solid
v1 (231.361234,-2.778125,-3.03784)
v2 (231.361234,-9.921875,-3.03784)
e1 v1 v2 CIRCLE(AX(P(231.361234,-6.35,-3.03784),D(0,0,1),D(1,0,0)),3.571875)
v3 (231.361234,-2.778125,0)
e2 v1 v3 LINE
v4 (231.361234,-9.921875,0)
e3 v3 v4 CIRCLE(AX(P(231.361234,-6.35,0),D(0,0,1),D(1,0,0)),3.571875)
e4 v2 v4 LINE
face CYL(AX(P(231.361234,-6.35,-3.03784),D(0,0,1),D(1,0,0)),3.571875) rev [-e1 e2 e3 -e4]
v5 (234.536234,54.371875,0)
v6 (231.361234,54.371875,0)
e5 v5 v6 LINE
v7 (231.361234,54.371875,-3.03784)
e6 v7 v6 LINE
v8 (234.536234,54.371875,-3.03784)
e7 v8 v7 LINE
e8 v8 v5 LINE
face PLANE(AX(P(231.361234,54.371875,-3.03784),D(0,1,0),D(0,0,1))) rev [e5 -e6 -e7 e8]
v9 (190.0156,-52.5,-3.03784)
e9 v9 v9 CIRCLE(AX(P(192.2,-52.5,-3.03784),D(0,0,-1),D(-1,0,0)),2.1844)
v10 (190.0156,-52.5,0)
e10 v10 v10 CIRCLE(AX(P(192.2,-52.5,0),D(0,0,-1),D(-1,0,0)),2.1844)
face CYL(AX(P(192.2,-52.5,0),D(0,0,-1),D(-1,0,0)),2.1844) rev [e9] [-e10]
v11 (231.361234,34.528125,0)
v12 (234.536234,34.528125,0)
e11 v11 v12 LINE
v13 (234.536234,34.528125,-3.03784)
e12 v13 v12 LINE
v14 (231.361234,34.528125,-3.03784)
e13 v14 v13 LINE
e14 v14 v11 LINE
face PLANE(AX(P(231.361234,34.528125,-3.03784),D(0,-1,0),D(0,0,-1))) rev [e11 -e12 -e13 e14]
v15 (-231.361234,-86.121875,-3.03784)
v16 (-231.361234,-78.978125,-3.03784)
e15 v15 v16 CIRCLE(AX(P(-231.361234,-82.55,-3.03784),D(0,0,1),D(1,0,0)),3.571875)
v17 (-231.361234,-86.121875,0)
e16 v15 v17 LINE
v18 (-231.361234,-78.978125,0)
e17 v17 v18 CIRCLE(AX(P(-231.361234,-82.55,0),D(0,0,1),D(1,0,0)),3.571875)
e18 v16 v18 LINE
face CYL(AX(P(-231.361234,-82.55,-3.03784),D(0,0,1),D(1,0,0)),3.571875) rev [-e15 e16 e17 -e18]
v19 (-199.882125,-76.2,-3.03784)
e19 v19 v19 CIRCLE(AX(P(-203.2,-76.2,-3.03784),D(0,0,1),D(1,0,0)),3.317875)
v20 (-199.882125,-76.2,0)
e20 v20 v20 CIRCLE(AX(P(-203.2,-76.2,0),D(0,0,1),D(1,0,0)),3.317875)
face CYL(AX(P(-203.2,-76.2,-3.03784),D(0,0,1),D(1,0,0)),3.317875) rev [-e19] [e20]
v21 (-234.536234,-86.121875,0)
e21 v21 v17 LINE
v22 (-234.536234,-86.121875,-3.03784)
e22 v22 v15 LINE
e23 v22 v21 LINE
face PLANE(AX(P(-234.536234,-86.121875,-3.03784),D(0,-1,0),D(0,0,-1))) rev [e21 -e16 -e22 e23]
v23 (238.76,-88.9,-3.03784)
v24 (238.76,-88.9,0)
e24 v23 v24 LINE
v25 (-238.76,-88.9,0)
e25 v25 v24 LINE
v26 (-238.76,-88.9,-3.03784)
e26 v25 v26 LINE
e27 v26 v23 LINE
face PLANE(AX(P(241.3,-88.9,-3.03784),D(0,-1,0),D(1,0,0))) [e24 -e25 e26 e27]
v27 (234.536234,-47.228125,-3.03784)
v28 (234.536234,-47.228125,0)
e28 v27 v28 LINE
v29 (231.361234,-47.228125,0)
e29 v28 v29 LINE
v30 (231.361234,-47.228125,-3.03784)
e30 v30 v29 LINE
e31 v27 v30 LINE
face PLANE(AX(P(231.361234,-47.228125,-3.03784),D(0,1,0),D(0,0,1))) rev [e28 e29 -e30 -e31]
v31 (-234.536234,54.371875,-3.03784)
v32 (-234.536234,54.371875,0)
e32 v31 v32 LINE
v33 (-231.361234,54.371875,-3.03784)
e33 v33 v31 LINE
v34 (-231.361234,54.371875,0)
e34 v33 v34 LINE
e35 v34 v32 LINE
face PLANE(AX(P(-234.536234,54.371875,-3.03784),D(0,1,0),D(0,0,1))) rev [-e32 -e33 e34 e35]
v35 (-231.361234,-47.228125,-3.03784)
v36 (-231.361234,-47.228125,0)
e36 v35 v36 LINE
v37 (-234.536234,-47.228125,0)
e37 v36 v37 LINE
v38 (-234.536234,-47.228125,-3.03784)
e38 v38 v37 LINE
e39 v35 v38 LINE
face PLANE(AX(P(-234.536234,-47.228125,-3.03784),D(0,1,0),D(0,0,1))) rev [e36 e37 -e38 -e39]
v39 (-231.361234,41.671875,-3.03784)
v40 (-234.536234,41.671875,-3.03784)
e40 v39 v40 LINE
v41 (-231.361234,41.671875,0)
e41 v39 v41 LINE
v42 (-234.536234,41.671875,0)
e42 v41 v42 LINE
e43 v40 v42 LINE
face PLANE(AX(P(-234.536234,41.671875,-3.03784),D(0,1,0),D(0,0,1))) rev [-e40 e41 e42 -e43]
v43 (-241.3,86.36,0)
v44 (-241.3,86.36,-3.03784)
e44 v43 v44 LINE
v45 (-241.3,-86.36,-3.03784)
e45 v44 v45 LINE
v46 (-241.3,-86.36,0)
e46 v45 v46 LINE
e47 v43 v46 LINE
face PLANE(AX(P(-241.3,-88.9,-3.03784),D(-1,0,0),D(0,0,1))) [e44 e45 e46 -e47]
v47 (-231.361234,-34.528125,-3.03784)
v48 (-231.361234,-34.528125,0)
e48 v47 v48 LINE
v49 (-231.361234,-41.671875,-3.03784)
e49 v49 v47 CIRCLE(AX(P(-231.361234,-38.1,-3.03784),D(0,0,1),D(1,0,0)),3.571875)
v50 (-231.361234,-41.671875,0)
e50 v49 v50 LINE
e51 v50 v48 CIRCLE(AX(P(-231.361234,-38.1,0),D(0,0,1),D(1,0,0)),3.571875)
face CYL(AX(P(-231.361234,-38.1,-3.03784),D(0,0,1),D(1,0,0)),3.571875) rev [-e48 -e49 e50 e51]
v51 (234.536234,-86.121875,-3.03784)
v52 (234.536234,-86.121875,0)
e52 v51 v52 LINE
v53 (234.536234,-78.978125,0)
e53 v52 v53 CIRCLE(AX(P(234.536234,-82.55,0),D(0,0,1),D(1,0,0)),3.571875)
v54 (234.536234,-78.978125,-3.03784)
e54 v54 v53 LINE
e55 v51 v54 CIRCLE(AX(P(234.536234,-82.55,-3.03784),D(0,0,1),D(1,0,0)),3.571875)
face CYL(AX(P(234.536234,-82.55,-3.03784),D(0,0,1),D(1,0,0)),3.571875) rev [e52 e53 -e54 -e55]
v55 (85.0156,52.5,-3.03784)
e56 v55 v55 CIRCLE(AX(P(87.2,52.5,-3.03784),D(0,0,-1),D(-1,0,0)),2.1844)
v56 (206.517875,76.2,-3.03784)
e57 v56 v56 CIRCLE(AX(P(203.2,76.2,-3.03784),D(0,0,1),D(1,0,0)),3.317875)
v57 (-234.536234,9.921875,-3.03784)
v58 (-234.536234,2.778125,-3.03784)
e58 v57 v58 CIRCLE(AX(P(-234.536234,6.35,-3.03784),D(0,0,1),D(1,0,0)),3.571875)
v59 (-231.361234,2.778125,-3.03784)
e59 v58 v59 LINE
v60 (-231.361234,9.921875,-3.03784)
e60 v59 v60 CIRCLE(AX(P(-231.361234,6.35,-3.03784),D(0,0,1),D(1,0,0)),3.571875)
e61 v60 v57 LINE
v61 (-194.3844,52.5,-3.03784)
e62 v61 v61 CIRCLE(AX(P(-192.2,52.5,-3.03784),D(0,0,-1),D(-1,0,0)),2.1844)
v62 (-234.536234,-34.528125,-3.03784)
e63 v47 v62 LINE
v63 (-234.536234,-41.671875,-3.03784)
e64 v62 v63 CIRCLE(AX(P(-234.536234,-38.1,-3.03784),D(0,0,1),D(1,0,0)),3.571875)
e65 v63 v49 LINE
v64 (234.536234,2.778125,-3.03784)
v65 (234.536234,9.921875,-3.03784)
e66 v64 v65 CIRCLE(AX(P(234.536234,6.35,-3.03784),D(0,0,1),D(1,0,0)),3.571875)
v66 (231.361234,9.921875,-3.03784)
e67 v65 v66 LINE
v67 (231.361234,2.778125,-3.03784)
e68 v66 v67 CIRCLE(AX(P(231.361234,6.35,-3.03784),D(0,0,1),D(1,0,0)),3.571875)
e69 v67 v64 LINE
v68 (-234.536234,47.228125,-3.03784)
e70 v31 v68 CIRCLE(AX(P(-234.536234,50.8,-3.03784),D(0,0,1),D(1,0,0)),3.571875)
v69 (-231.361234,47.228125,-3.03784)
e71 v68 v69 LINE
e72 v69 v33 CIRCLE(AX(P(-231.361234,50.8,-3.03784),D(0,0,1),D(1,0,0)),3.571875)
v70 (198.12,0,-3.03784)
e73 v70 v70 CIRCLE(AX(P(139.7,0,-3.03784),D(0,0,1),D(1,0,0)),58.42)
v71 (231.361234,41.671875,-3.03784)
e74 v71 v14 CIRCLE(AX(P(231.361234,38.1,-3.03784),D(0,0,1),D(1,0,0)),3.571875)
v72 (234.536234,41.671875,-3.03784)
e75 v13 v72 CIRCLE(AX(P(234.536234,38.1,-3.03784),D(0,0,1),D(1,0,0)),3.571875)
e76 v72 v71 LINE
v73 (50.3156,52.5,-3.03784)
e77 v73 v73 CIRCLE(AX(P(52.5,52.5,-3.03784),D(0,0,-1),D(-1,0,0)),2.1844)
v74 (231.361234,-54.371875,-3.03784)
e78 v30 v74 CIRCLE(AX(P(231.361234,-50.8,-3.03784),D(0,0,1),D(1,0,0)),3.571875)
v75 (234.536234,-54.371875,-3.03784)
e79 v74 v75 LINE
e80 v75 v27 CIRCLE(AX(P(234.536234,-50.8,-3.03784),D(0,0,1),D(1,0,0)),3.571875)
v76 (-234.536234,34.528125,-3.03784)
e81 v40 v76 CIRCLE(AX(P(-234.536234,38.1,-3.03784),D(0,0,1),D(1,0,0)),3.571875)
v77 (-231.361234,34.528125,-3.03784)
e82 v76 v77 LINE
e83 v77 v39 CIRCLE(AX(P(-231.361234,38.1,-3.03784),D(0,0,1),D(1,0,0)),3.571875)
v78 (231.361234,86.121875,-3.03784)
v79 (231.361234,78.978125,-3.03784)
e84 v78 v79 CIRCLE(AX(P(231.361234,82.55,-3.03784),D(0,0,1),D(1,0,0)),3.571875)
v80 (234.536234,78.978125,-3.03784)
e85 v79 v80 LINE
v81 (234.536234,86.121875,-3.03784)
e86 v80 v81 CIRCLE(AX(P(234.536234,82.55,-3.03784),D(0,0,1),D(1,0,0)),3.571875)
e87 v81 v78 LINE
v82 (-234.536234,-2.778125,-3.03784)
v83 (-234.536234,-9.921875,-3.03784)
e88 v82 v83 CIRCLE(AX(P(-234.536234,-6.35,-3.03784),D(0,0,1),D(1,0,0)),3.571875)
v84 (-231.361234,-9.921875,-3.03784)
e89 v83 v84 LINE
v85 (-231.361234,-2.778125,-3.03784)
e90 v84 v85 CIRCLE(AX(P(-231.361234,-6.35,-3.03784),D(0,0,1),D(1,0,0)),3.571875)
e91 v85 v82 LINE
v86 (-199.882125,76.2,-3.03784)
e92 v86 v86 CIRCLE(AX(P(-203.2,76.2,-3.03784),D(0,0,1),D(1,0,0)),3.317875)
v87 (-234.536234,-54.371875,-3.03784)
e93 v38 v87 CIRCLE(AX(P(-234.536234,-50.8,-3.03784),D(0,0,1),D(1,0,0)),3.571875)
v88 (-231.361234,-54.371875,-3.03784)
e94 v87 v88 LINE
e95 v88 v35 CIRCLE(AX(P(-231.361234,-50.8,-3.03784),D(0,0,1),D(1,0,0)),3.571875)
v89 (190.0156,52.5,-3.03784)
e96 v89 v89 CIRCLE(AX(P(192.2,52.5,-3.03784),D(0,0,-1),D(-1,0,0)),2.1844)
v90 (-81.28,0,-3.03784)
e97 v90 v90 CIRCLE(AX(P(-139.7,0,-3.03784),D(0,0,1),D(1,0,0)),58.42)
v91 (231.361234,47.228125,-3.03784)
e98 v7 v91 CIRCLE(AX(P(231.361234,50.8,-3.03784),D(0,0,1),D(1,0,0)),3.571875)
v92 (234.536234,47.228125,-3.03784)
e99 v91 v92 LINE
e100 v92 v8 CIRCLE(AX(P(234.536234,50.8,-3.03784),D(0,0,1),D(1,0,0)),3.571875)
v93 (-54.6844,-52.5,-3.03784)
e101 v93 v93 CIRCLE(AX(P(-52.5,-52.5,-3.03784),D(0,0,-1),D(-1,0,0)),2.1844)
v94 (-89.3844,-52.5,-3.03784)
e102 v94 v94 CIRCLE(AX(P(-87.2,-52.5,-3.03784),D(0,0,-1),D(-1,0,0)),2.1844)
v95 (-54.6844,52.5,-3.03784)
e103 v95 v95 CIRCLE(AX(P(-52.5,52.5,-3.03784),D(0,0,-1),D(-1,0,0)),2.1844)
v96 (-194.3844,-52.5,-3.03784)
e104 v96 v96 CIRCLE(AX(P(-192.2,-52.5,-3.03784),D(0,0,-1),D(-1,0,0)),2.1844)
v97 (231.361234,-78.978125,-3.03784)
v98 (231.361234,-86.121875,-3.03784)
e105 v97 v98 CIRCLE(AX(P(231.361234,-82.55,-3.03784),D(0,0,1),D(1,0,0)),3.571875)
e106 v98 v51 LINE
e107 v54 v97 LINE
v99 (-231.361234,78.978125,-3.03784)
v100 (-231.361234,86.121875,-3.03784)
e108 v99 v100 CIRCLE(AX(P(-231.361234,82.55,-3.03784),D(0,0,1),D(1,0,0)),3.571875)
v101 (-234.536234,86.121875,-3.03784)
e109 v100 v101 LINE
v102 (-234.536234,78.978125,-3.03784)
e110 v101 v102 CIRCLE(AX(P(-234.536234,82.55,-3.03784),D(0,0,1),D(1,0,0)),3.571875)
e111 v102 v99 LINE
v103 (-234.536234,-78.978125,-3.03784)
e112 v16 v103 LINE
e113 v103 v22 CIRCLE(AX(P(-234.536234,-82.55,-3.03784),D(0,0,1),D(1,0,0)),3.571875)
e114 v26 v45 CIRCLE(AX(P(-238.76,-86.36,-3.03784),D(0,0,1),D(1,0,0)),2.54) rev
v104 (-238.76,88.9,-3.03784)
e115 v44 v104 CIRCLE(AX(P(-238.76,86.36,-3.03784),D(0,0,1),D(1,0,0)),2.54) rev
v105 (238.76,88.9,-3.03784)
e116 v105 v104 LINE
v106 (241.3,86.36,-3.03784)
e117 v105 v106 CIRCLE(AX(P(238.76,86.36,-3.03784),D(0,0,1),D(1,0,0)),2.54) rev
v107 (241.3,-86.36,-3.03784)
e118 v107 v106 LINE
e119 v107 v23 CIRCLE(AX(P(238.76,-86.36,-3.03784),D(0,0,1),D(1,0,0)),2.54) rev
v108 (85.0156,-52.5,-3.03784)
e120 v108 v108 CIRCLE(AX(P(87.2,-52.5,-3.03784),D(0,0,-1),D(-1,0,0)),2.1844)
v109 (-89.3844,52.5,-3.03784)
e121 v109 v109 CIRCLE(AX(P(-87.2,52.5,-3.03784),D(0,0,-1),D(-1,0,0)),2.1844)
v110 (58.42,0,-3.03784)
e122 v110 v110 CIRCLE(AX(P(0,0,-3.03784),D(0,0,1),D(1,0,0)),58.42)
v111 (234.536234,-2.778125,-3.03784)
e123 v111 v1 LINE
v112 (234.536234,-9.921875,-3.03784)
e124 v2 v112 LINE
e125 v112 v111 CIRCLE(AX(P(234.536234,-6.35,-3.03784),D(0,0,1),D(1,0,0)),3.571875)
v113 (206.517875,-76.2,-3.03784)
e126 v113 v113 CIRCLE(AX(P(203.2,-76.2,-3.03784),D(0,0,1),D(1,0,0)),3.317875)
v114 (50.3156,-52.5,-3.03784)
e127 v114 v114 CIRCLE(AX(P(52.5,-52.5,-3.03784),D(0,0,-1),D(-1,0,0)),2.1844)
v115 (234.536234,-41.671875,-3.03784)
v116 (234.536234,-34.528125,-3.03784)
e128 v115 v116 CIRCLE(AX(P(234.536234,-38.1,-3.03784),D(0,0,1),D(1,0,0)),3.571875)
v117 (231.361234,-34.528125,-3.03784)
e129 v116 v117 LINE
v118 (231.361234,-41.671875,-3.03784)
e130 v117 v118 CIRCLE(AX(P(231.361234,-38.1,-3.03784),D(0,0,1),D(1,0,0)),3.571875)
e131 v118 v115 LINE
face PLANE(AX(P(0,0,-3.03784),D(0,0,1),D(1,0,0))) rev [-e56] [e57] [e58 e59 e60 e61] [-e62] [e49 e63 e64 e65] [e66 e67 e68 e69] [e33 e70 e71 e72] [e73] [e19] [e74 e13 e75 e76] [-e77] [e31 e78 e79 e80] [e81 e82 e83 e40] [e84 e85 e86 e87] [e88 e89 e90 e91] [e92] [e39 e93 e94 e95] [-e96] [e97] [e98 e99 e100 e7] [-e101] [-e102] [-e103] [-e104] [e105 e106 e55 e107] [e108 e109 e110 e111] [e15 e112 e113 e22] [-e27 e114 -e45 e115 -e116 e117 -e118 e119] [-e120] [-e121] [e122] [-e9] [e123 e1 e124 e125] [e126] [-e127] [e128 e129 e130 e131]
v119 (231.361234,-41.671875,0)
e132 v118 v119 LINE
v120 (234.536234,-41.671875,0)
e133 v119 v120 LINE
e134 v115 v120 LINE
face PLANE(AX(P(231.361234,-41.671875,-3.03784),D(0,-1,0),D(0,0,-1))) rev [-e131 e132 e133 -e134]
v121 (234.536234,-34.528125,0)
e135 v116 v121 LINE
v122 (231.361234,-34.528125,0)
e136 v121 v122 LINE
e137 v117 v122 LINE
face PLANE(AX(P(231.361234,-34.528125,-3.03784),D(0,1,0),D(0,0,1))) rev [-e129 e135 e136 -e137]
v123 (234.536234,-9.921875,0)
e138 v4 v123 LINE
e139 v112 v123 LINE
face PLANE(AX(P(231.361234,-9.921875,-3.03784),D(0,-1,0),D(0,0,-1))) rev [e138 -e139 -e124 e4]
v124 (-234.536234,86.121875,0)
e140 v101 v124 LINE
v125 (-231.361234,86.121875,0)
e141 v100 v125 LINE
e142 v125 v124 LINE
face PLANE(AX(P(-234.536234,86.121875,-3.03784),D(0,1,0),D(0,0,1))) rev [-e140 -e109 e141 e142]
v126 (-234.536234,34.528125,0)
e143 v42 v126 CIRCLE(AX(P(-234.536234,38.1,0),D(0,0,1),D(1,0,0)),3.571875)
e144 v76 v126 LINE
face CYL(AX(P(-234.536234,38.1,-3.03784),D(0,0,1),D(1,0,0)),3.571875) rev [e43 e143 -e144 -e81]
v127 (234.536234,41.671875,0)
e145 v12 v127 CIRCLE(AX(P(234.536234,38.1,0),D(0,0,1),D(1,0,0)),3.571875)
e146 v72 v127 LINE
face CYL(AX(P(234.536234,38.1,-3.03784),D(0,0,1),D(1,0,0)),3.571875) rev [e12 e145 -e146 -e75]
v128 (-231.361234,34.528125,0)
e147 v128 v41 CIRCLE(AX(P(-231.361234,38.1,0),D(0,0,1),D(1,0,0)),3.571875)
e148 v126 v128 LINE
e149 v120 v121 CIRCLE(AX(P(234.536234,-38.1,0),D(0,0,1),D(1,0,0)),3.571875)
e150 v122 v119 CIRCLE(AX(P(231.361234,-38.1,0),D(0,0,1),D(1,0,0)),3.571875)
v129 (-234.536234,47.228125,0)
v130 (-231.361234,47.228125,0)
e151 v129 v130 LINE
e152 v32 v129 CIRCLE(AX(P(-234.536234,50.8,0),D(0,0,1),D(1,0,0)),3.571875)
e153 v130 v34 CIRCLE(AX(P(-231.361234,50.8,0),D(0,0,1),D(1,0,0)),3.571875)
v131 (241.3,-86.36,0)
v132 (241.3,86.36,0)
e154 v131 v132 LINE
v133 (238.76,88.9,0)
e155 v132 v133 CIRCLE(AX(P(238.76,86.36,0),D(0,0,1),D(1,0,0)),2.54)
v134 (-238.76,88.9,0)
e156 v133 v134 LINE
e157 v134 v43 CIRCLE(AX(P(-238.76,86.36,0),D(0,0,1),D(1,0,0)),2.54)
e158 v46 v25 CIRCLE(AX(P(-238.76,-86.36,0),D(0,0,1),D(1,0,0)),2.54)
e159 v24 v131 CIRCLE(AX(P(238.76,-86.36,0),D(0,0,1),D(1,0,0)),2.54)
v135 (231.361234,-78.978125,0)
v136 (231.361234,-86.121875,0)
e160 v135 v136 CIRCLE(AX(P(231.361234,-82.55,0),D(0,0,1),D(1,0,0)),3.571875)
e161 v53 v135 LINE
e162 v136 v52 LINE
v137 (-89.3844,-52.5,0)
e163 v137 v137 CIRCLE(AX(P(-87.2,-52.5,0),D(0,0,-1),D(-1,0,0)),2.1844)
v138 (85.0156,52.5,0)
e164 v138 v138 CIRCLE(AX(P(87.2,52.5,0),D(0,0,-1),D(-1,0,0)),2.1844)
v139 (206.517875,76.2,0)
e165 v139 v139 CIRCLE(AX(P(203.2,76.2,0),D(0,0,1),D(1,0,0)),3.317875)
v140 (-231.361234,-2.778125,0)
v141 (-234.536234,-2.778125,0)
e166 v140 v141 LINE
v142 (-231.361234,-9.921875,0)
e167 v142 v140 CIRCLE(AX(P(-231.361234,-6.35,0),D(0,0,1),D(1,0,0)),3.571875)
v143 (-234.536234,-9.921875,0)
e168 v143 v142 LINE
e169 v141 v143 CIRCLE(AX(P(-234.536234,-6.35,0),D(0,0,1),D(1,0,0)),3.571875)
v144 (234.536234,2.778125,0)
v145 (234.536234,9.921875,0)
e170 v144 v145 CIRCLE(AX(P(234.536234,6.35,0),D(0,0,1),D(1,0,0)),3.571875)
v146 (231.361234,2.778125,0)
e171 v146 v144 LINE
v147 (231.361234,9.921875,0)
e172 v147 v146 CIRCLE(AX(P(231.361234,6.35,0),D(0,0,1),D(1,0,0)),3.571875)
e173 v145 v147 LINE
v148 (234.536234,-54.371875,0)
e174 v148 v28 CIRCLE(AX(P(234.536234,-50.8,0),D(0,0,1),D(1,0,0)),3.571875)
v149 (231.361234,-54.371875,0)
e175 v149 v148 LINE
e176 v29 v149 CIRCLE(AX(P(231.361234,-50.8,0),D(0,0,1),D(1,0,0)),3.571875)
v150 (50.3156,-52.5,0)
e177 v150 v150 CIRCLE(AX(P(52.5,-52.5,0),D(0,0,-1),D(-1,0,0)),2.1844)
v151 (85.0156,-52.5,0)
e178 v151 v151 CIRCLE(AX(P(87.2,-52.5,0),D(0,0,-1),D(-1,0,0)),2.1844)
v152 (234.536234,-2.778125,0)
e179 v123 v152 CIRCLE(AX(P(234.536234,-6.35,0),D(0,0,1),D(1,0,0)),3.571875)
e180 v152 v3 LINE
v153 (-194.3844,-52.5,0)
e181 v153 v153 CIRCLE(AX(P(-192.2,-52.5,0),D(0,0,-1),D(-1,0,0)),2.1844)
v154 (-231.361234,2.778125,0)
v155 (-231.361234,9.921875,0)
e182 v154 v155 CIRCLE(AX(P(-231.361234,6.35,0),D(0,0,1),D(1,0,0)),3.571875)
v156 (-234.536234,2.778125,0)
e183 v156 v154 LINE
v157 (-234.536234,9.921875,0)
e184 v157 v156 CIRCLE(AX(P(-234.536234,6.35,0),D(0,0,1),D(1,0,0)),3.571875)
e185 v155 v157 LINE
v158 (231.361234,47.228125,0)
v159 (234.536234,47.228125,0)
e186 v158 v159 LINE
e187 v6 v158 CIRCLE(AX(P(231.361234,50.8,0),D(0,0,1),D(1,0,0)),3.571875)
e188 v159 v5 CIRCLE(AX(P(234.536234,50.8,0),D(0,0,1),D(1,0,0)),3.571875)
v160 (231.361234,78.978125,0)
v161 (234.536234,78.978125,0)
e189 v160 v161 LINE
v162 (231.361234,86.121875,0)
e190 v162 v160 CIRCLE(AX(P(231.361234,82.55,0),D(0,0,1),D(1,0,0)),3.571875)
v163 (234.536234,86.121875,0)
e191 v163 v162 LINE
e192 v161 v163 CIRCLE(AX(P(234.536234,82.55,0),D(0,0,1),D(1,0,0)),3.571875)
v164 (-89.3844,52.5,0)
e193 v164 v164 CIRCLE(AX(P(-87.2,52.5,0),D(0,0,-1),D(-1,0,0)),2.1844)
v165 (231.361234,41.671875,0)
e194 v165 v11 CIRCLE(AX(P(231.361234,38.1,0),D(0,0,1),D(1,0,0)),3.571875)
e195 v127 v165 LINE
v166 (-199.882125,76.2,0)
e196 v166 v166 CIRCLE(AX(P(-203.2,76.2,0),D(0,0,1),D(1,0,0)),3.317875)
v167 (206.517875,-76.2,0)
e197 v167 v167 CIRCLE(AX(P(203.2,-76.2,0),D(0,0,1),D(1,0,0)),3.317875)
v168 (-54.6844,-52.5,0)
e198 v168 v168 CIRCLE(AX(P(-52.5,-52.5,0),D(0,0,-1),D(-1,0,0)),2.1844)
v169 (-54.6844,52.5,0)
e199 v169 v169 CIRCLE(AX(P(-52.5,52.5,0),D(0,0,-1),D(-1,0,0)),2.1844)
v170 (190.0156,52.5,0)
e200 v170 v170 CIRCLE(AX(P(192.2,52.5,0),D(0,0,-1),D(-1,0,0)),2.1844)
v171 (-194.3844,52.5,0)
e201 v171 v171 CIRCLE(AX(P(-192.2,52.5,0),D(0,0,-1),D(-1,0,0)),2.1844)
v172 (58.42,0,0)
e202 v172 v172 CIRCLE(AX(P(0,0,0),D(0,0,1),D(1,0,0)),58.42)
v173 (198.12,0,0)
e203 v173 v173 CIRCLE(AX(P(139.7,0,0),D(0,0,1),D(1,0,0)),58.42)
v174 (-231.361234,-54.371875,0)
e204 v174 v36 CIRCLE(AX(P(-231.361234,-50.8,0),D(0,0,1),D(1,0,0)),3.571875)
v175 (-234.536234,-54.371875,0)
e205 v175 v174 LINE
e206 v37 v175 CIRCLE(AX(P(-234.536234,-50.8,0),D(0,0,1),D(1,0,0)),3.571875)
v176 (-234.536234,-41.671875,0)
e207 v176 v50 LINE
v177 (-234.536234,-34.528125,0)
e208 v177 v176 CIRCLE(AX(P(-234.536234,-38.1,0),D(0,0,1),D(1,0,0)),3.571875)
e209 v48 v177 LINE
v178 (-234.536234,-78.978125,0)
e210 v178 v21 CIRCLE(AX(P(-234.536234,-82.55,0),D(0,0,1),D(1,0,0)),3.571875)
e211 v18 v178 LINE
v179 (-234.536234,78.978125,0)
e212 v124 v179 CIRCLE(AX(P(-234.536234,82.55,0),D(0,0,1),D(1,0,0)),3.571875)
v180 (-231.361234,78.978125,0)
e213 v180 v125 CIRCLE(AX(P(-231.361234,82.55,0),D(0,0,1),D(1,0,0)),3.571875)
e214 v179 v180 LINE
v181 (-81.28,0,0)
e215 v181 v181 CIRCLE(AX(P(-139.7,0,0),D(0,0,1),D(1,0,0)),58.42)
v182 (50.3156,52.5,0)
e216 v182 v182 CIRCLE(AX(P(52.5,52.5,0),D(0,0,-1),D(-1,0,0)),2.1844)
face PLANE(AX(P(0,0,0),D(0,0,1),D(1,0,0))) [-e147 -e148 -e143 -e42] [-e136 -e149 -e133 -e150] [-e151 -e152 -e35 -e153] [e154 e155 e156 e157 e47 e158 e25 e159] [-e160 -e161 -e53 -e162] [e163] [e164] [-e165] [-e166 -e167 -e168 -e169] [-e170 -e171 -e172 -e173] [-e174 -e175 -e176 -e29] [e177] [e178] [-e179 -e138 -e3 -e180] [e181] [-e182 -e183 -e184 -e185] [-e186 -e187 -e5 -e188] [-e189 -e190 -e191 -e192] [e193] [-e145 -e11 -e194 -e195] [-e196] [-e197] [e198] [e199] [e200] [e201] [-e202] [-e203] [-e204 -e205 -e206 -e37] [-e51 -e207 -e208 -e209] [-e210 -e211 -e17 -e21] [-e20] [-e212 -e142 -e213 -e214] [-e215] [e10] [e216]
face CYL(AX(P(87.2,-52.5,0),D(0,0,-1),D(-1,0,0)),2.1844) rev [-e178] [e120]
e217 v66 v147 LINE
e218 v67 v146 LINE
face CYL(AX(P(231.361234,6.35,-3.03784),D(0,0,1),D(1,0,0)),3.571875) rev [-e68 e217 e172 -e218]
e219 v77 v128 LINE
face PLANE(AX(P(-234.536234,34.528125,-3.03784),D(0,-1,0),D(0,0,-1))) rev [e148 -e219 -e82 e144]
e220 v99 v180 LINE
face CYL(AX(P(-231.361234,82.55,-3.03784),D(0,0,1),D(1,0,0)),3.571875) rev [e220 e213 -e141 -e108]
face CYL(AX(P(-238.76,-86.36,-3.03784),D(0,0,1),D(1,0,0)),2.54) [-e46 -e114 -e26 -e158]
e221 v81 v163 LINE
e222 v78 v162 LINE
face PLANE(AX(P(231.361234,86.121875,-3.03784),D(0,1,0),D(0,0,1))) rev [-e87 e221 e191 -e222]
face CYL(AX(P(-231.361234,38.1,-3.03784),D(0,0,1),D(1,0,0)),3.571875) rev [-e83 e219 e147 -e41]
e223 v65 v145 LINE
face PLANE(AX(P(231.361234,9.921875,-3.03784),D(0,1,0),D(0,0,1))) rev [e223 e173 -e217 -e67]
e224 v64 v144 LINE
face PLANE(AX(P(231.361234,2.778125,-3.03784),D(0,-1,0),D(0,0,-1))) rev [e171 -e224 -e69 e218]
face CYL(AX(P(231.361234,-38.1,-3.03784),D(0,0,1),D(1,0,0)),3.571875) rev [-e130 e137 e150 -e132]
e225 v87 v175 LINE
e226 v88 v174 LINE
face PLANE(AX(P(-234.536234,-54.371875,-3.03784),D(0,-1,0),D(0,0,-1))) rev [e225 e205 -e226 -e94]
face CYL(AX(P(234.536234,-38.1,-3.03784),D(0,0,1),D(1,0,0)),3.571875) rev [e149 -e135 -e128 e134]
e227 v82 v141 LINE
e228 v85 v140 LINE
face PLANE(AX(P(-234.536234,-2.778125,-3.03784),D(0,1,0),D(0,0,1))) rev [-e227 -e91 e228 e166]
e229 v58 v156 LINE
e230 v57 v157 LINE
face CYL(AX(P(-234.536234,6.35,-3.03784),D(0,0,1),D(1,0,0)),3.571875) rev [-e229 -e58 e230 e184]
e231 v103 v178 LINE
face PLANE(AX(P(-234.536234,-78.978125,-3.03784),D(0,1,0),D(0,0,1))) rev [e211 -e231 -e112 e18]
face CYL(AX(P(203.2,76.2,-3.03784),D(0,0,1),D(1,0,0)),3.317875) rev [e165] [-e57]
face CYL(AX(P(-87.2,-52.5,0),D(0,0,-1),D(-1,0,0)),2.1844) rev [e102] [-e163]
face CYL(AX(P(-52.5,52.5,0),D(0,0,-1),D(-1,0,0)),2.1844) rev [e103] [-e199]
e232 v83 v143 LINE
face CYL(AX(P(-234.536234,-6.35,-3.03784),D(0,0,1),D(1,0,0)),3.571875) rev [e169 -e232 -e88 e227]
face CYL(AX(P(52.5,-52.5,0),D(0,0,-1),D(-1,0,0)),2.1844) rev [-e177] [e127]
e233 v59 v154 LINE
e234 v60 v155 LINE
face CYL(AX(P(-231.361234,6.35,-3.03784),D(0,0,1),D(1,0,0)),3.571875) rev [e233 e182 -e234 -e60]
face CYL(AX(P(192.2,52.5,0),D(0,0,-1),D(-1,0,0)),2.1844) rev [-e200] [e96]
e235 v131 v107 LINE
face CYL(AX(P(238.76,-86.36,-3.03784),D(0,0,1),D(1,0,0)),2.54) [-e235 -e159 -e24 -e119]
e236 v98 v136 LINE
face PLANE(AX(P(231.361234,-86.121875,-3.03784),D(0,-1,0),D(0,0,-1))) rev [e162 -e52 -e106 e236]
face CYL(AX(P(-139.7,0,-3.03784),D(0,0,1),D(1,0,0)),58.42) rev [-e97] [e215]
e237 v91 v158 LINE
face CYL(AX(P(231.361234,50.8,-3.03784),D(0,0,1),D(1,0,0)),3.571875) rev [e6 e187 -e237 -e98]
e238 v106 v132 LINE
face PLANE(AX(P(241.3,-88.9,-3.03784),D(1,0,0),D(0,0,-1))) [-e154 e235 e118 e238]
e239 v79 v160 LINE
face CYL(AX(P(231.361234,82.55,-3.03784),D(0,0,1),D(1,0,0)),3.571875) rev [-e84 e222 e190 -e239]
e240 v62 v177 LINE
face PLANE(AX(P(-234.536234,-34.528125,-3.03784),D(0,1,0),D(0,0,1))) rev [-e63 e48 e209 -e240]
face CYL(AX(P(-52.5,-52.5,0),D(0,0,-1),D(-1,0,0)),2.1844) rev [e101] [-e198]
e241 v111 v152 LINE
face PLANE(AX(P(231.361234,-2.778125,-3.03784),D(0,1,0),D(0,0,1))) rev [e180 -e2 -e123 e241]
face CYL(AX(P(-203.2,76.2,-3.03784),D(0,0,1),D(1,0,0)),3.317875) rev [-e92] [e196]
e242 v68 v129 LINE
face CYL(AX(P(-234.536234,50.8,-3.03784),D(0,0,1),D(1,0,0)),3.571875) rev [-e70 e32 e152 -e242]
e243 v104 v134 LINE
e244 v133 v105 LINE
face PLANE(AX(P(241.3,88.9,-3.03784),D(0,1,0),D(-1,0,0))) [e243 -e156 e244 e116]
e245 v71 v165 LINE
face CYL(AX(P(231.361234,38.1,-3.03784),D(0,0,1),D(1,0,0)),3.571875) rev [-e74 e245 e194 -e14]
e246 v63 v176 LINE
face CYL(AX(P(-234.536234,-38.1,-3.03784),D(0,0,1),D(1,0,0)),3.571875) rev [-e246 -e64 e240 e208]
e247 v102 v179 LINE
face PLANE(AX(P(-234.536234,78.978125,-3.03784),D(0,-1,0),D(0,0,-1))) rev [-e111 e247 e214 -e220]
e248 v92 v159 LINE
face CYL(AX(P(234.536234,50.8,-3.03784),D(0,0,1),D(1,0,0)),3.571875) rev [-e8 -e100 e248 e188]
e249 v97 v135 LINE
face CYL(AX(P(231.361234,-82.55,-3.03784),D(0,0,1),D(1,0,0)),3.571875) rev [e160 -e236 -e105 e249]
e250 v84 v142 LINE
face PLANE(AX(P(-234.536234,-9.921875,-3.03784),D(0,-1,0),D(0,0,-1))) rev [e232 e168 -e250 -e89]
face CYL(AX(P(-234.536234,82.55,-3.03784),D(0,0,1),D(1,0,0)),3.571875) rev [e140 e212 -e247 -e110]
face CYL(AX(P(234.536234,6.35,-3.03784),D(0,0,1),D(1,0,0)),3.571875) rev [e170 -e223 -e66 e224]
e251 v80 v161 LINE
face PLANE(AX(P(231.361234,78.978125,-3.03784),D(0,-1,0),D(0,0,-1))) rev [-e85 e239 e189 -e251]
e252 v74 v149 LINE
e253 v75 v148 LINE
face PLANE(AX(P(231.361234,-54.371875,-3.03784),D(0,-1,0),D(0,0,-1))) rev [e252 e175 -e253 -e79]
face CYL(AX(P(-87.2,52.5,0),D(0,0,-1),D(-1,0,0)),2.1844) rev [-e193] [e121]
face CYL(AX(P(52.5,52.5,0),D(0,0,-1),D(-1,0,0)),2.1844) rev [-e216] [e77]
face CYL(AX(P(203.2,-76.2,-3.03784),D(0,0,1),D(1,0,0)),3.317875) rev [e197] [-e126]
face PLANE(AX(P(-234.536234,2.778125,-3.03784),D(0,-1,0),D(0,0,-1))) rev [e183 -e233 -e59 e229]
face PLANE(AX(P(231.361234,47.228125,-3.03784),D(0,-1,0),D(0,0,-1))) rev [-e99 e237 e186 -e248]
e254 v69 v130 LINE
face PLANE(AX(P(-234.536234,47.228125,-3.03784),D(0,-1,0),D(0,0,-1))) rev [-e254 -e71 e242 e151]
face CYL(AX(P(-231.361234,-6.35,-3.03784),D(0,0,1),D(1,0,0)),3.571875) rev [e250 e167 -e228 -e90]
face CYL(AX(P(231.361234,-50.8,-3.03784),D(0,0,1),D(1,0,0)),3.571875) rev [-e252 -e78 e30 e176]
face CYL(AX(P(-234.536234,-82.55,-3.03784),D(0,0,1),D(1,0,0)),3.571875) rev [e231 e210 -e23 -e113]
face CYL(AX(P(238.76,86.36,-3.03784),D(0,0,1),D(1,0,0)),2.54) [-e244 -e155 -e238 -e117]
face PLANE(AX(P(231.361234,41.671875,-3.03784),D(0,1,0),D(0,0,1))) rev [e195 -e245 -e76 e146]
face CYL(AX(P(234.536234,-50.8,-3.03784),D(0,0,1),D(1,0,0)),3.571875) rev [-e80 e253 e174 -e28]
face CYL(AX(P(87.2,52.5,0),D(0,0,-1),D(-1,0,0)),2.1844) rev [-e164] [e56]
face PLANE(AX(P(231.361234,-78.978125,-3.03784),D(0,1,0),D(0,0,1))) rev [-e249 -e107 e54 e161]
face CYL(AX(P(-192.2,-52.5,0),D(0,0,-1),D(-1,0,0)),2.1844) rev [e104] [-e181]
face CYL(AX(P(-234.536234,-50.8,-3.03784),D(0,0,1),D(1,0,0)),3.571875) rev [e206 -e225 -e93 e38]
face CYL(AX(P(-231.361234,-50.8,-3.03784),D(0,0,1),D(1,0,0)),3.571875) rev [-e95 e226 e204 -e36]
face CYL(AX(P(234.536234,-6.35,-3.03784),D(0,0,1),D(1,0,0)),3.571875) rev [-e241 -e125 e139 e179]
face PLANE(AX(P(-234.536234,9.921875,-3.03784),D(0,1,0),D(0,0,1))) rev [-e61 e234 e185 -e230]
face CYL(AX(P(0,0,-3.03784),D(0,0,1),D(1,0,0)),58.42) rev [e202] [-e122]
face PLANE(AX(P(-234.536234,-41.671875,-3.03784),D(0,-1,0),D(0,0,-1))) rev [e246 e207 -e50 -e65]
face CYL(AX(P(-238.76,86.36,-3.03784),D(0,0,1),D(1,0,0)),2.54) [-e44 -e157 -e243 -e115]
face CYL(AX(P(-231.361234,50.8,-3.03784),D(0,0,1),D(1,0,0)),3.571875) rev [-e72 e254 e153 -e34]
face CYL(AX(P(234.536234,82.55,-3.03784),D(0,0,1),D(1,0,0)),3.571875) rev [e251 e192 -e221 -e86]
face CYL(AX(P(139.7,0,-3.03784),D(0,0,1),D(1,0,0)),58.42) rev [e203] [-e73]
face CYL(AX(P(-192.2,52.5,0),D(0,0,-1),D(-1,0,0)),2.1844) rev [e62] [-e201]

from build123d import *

# Parameters (mm, degrees)
ESQUISSE1_W               = 482.6
ESQUISSE1_H               = 177.8
T_LE_DE_BASE_PLI_E1_DEPTH = 3.03784
ENL_V_MAT_EXTRU_1_DEPTH   = 258.173343237
CONG_1_R                  = 2.54
ESQUISSE5_R               = 58.42
ENL_V_MAT_EXTRU_2_DEPTH   = 258.173343237
ESQUISSE6_R               = 2.1844
ENL_V_MAT_EXTRU_3_DEPTH   = 258.173343237
ESQUISSE7_R               = 3.317875
ENL_V_MAT_EXTRU_4_DEPTH   = 258.173343237


# Sheet-metal steps are written as plain solids
with BuildPart() as part:
    # Esquisse1 → Tôle de base pliée1 (new body)
    with BuildSketch(Plane.XY):
        Rectangle(ESQUISSE1_W, ESQUISSE1_H)
    extrude(amount=-T_LE_DE_BASE_PLI_E1_DEPTH)

    # Esquisse4 → Enlèv. mat.-Extru.1 (cut, through all)
    with BuildSketch(Plane.XY):
        with BuildLine():
            Line((-234.536234, -78.978125), (-231.361234, -78.978125))
            ThreePointArc((-231.361234, -78.978125), (-227.789359, -82.55), (-231.361234, -86.121875))
            Line((-231.361234, -86.121875), (-234.536234, -86.121875))
            ThreePointArc((-234.536234, -86.121875), (-238.108109, -82.55), (-234.536234, -78.978125))
        make_face()
        with BuildLine():
            Line((-234.536234, 86.121875), (-231.361234, 86.121875))
            ThreePointArc((-231.361234, 86.121875), (-227.789359, 82.55), (-231.361234, 78.978125))
            Line((-231.361234, 78.978125), (-234.536234, 78.978125))
            ThreePointArc((-234.536234, 78.978125), (-238.108109, 82.55), (-234.536234, 86.121875))
        make_face()
        with BuildLine():
            Line((231.361234, 86.121875), (234.536234, 86.121875))
            ThreePointArc((234.536234, 86.121875), (238.108109, 82.55), (234.536234, 78.978125))
            Line((234.536234, 78.978125), (231.361234, 78.978125))
            ThreePointArc((231.361234, 78.978125), (227.789359, 82.55), (231.361234, 86.121875))
        make_face()
        with BuildLine():
            Line((231.361234, -78.978125), (234.536234, -78.978125))
            ThreePointArc((234.536234, -78.978125), (238.108109, -82.55), (234.536234, -86.121875))
            Line((234.536234, -86.121875), (231.361234, -86.121875))
            ThreePointArc((231.361234, -86.121875), (227.789359, -82.55), (231.361234, -78.978125))
        make_face()
        with BuildLine():
            Line((-234.536234, -34.528125), (-231.361234, -34.528125))
            ThreePointArc((-231.361234, -34.528125), (-227.789359, -38.1), (-231.361234, -41.671875))
            Line((-231.361234, -41.671875), (-234.536234, -41.671875))
            ThreePointArc((-234.536234, -41.671875), (-238.108109, -38.1), (-234.536234, -34.528125))
        make_face()
        with BuildLine():
            Line((-234.536234, -47.228125), (-231.361234, -47.228125))
            ThreePointArc((-231.361234, -47.228125), (-227.789359, -50.8), (-231.361234, -54.371875))
            Line((-231.361234, -54.371875), (-234.536234, -54.371875))
            ThreePointArc((-234.536234, -54.371875), (-238.108109, -50.8), (-234.536234, -47.228125))
        make_face()
        with BuildLine():
            Line((231.361234, -47.228125), (234.536234, -47.228125))
            ThreePointArc((234.536234, -47.228125), (238.108109, -50.8), (234.536234, -54.371875))
            Line((234.536234, -54.371875), (231.361234, -54.371875))
            ThreePointArc((231.361234, -54.371875), (227.789359, -50.8), (231.361234, -47.228125))
        make_face()
        with BuildLine():
            Line((231.361234, -34.528125), (234.536234, -34.528125))
            ThreePointArc((234.536234, -34.528125), (238.108109, -38.1), (234.536234, -41.671875))
            Line((234.536234, -41.671875), (231.361234, -41.671875))
            ThreePointArc((231.361234, -41.671875), (227.789359, -38.1), (231.361234, -34.528125))
        make_face()
        with BuildLine():
            Line((-234.536234, 9.921875), (-231.361234, 9.921875))
            ThreePointArc((-231.361234, 9.921875), (-227.789359, 6.35), (-231.361234, 2.778125))
            Line((-231.361234, 2.778125), (-234.536234, 2.778125))
            ThreePointArc((-234.536234, 2.778125), (-238.108109, 6.35), (-234.536234, 9.921875))
        make_face()
        with BuildLine():
            Line((-234.536234, -2.778125), (-231.361234, -2.778125))
            ThreePointArc((-231.361234, -2.778125), (-227.789359, -6.35), (-231.361234, -9.921875))
            Line((-231.361234, -9.921875), (-234.536234, -9.921875))
            ThreePointArc((-234.536234, -9.921875), (-238.108109, -6.35), (-234.536234, -2.778125))
        make_face()
        with BuildLine():
            Line((231.361234, 54.371875), (234.536234, 54.371875))
            ThreePointArc((234.536234, 54.371875), (238.108109, 50.8), (234.536234, 47.228125))
            Line((234.536234, 47.228125), (231.361234, 47.228125))
            ThreePointArc((231.361234, 47.228125), (227.789359, 50.8), (231.361234, 54.371875))
        make_face()
        with BuildLine():
            Line((231.361234, 41.671875), (234.536234, 41.671875))
            ThreePointArc((234.536234, 41.671875), (238.108109, 38.1), (234.536234, 34.528125))
            Line((234.536234, 34.528125), (231.361234, 34.528125))
            ThreePointArc((231.361234, 34.528125), (227.789359, 38.1), (231.361234, 41.671875))
        make_face()
        with BuildLine():
            Line((-234.536234, 54.371875), (-231.361234, 54.371875))
            ThreePointArc((-231.361234, 54.371875), (-227.789359, 50.8), (-231.361234, 47.228125))
            Line((-231.361234, 47.228125), (-234.536234, 47.228125))
            ThreePointArc((-234.536234, 47.228125), (-238.108109, 50.8), (-234.536234, 54.371875))
        make_face()
        with BuildLine():
            Line((-234.536234, 41.671875), (-231.361234, 41.671875))
            ThreePointArc((-231.361234, 41.671875), (-227.789359, 38.1), (-231.361234, 34.528125))
            Line((-231.361234, 34.528125), (-234.536234, 34.528125))
            ThreePointArc((-234.536234, 34.528125), (-238.108109, 38.1), (-234.536234, 41.671875))
        make_face()
        with BuildLine():
            Line((231.361234, 9.921875), (234.536234, 9.921875))
            ThreePointArc((234.536234, 9.921875), (238.108109, 6.35), (234.536234, 2.778125))
            Line((234.536234, 2.778125), (231.361234, 2.778125))
            ThreePointArc((231.361234, 2.778125), (227.789359, 6.35), (231.361234, 9.921875))
        make_face()
        with BuildLine():
            Line((231.361234, -2.778125), (234.536234, -2.778125))
            ThreePointArc((234.536234, -2.778125), (238.108109, -6.35), (234.536234, -9.921875))
            Line((234.536234, -9.921875), (231.361234, -9.921875))
            ThreePointArc((231.361234, -9.921875), (227.789359, -6.35), (231.361234, -2.778125))
        make_face()
    extrude(amount=-ENL_V_MAT_EXTRU_1_DEPTH, mode=Mode.SUBTRACT)

    # Congé1
    cong_1_edges = [part.edges().sort_by_distance(p)[0] for p in [
        (-241.3, 88.9, -1.51892),
        (241.3, 88.9, -1.51892),
        (241.3, -88.9, -1.51892),
        (-241.3, -88.9, -1.51892),
    ]]
    fillet(cong_1_edges, radius=CONG_1_R)

    # Esquisse5 → Enlèv. mat.-Extru.2 (cut, through all)
    with BuildSketch(Plane.XY):
        Circle(ESQUISSE5_R)
        with Locations((-139.7, 0)):
            Circle(ESQUISSE5_R)
        with Locations((139.7, 0)):
            Circle(ESQUISSE5_R)
    extrude(amount=-ENL_V_MAT_EXTRU_2_DEPTH, mode=Mode.SUBTRACT)

    # Esquisse6 → Enlèv. mat.-Extru.3 (cut, through all)
    with BuildSketch(Plane(origin=(0, 0, -3.03784), x_dir=(-1, 0, 0), z_dir=(0, 0, -1))):
        with Locations((-192.2, 52.5)):
            Circle(ESQUISSE6_R)
        with Locations((-87.2, 52.5)):
            Circle(ESQUISSE6_R)
        with Locations((-52.5, 52.5)):
            Circle(ESQUISSE6_R)
        with Locations((-87.2, -52.5)):
            Circle(ESQUISSE6_R)
        with Locations((-52.5, -52.5)):
            Circle(ESQUISSE6_R)
        with Locations((-192.2, -52.5)):
            Circle(ESQUISSE6_R)
        with Locations((52.5, 52.5)):
            Circle(ESQUISSE6_R)
        with Locations((52.5, -52.5)):
            Circle(ESQUISSE6_R)
        with Locations((87.2, -52.5)):
            Circle(ESQUISSE6_R)
        with Locations((87.2, 52.5)):
            Circle(ESQUISSE6_R)
        with Locations((192.2, 52.5)):
            Circle(ESQUISSE6_R)
        with Locations((192.2, -52.5)):
            Circle(ESQUISSE6_R)
    extrude(amount=-ENL_V_MAT_EXTRU_3_DEPTH, mode=Mode.SUBTRACT)

    # Esquisse7 → Enlèv. mat.-Extru.4 (cut, through all)
    with BuildSketch(Plane.XY):
        with Locations((-203.2, 76.2)):
            Circle(ESQUISSE7_R)
        with Locations((-203.2, -76.2)):
            Circle(ESQUISSE7_R)
        with Locations((203.2, -76.2)):
            Circle(ESQUISSE7_R)
        with Locations((203.2, 76.2)):
            Circle(ESQUISSE7_R)
    extrude(amount=-ENL_V_MAT_EXTRU_4_DEPTH, mode=Mode.SUBTRACT)


solid = part.part
